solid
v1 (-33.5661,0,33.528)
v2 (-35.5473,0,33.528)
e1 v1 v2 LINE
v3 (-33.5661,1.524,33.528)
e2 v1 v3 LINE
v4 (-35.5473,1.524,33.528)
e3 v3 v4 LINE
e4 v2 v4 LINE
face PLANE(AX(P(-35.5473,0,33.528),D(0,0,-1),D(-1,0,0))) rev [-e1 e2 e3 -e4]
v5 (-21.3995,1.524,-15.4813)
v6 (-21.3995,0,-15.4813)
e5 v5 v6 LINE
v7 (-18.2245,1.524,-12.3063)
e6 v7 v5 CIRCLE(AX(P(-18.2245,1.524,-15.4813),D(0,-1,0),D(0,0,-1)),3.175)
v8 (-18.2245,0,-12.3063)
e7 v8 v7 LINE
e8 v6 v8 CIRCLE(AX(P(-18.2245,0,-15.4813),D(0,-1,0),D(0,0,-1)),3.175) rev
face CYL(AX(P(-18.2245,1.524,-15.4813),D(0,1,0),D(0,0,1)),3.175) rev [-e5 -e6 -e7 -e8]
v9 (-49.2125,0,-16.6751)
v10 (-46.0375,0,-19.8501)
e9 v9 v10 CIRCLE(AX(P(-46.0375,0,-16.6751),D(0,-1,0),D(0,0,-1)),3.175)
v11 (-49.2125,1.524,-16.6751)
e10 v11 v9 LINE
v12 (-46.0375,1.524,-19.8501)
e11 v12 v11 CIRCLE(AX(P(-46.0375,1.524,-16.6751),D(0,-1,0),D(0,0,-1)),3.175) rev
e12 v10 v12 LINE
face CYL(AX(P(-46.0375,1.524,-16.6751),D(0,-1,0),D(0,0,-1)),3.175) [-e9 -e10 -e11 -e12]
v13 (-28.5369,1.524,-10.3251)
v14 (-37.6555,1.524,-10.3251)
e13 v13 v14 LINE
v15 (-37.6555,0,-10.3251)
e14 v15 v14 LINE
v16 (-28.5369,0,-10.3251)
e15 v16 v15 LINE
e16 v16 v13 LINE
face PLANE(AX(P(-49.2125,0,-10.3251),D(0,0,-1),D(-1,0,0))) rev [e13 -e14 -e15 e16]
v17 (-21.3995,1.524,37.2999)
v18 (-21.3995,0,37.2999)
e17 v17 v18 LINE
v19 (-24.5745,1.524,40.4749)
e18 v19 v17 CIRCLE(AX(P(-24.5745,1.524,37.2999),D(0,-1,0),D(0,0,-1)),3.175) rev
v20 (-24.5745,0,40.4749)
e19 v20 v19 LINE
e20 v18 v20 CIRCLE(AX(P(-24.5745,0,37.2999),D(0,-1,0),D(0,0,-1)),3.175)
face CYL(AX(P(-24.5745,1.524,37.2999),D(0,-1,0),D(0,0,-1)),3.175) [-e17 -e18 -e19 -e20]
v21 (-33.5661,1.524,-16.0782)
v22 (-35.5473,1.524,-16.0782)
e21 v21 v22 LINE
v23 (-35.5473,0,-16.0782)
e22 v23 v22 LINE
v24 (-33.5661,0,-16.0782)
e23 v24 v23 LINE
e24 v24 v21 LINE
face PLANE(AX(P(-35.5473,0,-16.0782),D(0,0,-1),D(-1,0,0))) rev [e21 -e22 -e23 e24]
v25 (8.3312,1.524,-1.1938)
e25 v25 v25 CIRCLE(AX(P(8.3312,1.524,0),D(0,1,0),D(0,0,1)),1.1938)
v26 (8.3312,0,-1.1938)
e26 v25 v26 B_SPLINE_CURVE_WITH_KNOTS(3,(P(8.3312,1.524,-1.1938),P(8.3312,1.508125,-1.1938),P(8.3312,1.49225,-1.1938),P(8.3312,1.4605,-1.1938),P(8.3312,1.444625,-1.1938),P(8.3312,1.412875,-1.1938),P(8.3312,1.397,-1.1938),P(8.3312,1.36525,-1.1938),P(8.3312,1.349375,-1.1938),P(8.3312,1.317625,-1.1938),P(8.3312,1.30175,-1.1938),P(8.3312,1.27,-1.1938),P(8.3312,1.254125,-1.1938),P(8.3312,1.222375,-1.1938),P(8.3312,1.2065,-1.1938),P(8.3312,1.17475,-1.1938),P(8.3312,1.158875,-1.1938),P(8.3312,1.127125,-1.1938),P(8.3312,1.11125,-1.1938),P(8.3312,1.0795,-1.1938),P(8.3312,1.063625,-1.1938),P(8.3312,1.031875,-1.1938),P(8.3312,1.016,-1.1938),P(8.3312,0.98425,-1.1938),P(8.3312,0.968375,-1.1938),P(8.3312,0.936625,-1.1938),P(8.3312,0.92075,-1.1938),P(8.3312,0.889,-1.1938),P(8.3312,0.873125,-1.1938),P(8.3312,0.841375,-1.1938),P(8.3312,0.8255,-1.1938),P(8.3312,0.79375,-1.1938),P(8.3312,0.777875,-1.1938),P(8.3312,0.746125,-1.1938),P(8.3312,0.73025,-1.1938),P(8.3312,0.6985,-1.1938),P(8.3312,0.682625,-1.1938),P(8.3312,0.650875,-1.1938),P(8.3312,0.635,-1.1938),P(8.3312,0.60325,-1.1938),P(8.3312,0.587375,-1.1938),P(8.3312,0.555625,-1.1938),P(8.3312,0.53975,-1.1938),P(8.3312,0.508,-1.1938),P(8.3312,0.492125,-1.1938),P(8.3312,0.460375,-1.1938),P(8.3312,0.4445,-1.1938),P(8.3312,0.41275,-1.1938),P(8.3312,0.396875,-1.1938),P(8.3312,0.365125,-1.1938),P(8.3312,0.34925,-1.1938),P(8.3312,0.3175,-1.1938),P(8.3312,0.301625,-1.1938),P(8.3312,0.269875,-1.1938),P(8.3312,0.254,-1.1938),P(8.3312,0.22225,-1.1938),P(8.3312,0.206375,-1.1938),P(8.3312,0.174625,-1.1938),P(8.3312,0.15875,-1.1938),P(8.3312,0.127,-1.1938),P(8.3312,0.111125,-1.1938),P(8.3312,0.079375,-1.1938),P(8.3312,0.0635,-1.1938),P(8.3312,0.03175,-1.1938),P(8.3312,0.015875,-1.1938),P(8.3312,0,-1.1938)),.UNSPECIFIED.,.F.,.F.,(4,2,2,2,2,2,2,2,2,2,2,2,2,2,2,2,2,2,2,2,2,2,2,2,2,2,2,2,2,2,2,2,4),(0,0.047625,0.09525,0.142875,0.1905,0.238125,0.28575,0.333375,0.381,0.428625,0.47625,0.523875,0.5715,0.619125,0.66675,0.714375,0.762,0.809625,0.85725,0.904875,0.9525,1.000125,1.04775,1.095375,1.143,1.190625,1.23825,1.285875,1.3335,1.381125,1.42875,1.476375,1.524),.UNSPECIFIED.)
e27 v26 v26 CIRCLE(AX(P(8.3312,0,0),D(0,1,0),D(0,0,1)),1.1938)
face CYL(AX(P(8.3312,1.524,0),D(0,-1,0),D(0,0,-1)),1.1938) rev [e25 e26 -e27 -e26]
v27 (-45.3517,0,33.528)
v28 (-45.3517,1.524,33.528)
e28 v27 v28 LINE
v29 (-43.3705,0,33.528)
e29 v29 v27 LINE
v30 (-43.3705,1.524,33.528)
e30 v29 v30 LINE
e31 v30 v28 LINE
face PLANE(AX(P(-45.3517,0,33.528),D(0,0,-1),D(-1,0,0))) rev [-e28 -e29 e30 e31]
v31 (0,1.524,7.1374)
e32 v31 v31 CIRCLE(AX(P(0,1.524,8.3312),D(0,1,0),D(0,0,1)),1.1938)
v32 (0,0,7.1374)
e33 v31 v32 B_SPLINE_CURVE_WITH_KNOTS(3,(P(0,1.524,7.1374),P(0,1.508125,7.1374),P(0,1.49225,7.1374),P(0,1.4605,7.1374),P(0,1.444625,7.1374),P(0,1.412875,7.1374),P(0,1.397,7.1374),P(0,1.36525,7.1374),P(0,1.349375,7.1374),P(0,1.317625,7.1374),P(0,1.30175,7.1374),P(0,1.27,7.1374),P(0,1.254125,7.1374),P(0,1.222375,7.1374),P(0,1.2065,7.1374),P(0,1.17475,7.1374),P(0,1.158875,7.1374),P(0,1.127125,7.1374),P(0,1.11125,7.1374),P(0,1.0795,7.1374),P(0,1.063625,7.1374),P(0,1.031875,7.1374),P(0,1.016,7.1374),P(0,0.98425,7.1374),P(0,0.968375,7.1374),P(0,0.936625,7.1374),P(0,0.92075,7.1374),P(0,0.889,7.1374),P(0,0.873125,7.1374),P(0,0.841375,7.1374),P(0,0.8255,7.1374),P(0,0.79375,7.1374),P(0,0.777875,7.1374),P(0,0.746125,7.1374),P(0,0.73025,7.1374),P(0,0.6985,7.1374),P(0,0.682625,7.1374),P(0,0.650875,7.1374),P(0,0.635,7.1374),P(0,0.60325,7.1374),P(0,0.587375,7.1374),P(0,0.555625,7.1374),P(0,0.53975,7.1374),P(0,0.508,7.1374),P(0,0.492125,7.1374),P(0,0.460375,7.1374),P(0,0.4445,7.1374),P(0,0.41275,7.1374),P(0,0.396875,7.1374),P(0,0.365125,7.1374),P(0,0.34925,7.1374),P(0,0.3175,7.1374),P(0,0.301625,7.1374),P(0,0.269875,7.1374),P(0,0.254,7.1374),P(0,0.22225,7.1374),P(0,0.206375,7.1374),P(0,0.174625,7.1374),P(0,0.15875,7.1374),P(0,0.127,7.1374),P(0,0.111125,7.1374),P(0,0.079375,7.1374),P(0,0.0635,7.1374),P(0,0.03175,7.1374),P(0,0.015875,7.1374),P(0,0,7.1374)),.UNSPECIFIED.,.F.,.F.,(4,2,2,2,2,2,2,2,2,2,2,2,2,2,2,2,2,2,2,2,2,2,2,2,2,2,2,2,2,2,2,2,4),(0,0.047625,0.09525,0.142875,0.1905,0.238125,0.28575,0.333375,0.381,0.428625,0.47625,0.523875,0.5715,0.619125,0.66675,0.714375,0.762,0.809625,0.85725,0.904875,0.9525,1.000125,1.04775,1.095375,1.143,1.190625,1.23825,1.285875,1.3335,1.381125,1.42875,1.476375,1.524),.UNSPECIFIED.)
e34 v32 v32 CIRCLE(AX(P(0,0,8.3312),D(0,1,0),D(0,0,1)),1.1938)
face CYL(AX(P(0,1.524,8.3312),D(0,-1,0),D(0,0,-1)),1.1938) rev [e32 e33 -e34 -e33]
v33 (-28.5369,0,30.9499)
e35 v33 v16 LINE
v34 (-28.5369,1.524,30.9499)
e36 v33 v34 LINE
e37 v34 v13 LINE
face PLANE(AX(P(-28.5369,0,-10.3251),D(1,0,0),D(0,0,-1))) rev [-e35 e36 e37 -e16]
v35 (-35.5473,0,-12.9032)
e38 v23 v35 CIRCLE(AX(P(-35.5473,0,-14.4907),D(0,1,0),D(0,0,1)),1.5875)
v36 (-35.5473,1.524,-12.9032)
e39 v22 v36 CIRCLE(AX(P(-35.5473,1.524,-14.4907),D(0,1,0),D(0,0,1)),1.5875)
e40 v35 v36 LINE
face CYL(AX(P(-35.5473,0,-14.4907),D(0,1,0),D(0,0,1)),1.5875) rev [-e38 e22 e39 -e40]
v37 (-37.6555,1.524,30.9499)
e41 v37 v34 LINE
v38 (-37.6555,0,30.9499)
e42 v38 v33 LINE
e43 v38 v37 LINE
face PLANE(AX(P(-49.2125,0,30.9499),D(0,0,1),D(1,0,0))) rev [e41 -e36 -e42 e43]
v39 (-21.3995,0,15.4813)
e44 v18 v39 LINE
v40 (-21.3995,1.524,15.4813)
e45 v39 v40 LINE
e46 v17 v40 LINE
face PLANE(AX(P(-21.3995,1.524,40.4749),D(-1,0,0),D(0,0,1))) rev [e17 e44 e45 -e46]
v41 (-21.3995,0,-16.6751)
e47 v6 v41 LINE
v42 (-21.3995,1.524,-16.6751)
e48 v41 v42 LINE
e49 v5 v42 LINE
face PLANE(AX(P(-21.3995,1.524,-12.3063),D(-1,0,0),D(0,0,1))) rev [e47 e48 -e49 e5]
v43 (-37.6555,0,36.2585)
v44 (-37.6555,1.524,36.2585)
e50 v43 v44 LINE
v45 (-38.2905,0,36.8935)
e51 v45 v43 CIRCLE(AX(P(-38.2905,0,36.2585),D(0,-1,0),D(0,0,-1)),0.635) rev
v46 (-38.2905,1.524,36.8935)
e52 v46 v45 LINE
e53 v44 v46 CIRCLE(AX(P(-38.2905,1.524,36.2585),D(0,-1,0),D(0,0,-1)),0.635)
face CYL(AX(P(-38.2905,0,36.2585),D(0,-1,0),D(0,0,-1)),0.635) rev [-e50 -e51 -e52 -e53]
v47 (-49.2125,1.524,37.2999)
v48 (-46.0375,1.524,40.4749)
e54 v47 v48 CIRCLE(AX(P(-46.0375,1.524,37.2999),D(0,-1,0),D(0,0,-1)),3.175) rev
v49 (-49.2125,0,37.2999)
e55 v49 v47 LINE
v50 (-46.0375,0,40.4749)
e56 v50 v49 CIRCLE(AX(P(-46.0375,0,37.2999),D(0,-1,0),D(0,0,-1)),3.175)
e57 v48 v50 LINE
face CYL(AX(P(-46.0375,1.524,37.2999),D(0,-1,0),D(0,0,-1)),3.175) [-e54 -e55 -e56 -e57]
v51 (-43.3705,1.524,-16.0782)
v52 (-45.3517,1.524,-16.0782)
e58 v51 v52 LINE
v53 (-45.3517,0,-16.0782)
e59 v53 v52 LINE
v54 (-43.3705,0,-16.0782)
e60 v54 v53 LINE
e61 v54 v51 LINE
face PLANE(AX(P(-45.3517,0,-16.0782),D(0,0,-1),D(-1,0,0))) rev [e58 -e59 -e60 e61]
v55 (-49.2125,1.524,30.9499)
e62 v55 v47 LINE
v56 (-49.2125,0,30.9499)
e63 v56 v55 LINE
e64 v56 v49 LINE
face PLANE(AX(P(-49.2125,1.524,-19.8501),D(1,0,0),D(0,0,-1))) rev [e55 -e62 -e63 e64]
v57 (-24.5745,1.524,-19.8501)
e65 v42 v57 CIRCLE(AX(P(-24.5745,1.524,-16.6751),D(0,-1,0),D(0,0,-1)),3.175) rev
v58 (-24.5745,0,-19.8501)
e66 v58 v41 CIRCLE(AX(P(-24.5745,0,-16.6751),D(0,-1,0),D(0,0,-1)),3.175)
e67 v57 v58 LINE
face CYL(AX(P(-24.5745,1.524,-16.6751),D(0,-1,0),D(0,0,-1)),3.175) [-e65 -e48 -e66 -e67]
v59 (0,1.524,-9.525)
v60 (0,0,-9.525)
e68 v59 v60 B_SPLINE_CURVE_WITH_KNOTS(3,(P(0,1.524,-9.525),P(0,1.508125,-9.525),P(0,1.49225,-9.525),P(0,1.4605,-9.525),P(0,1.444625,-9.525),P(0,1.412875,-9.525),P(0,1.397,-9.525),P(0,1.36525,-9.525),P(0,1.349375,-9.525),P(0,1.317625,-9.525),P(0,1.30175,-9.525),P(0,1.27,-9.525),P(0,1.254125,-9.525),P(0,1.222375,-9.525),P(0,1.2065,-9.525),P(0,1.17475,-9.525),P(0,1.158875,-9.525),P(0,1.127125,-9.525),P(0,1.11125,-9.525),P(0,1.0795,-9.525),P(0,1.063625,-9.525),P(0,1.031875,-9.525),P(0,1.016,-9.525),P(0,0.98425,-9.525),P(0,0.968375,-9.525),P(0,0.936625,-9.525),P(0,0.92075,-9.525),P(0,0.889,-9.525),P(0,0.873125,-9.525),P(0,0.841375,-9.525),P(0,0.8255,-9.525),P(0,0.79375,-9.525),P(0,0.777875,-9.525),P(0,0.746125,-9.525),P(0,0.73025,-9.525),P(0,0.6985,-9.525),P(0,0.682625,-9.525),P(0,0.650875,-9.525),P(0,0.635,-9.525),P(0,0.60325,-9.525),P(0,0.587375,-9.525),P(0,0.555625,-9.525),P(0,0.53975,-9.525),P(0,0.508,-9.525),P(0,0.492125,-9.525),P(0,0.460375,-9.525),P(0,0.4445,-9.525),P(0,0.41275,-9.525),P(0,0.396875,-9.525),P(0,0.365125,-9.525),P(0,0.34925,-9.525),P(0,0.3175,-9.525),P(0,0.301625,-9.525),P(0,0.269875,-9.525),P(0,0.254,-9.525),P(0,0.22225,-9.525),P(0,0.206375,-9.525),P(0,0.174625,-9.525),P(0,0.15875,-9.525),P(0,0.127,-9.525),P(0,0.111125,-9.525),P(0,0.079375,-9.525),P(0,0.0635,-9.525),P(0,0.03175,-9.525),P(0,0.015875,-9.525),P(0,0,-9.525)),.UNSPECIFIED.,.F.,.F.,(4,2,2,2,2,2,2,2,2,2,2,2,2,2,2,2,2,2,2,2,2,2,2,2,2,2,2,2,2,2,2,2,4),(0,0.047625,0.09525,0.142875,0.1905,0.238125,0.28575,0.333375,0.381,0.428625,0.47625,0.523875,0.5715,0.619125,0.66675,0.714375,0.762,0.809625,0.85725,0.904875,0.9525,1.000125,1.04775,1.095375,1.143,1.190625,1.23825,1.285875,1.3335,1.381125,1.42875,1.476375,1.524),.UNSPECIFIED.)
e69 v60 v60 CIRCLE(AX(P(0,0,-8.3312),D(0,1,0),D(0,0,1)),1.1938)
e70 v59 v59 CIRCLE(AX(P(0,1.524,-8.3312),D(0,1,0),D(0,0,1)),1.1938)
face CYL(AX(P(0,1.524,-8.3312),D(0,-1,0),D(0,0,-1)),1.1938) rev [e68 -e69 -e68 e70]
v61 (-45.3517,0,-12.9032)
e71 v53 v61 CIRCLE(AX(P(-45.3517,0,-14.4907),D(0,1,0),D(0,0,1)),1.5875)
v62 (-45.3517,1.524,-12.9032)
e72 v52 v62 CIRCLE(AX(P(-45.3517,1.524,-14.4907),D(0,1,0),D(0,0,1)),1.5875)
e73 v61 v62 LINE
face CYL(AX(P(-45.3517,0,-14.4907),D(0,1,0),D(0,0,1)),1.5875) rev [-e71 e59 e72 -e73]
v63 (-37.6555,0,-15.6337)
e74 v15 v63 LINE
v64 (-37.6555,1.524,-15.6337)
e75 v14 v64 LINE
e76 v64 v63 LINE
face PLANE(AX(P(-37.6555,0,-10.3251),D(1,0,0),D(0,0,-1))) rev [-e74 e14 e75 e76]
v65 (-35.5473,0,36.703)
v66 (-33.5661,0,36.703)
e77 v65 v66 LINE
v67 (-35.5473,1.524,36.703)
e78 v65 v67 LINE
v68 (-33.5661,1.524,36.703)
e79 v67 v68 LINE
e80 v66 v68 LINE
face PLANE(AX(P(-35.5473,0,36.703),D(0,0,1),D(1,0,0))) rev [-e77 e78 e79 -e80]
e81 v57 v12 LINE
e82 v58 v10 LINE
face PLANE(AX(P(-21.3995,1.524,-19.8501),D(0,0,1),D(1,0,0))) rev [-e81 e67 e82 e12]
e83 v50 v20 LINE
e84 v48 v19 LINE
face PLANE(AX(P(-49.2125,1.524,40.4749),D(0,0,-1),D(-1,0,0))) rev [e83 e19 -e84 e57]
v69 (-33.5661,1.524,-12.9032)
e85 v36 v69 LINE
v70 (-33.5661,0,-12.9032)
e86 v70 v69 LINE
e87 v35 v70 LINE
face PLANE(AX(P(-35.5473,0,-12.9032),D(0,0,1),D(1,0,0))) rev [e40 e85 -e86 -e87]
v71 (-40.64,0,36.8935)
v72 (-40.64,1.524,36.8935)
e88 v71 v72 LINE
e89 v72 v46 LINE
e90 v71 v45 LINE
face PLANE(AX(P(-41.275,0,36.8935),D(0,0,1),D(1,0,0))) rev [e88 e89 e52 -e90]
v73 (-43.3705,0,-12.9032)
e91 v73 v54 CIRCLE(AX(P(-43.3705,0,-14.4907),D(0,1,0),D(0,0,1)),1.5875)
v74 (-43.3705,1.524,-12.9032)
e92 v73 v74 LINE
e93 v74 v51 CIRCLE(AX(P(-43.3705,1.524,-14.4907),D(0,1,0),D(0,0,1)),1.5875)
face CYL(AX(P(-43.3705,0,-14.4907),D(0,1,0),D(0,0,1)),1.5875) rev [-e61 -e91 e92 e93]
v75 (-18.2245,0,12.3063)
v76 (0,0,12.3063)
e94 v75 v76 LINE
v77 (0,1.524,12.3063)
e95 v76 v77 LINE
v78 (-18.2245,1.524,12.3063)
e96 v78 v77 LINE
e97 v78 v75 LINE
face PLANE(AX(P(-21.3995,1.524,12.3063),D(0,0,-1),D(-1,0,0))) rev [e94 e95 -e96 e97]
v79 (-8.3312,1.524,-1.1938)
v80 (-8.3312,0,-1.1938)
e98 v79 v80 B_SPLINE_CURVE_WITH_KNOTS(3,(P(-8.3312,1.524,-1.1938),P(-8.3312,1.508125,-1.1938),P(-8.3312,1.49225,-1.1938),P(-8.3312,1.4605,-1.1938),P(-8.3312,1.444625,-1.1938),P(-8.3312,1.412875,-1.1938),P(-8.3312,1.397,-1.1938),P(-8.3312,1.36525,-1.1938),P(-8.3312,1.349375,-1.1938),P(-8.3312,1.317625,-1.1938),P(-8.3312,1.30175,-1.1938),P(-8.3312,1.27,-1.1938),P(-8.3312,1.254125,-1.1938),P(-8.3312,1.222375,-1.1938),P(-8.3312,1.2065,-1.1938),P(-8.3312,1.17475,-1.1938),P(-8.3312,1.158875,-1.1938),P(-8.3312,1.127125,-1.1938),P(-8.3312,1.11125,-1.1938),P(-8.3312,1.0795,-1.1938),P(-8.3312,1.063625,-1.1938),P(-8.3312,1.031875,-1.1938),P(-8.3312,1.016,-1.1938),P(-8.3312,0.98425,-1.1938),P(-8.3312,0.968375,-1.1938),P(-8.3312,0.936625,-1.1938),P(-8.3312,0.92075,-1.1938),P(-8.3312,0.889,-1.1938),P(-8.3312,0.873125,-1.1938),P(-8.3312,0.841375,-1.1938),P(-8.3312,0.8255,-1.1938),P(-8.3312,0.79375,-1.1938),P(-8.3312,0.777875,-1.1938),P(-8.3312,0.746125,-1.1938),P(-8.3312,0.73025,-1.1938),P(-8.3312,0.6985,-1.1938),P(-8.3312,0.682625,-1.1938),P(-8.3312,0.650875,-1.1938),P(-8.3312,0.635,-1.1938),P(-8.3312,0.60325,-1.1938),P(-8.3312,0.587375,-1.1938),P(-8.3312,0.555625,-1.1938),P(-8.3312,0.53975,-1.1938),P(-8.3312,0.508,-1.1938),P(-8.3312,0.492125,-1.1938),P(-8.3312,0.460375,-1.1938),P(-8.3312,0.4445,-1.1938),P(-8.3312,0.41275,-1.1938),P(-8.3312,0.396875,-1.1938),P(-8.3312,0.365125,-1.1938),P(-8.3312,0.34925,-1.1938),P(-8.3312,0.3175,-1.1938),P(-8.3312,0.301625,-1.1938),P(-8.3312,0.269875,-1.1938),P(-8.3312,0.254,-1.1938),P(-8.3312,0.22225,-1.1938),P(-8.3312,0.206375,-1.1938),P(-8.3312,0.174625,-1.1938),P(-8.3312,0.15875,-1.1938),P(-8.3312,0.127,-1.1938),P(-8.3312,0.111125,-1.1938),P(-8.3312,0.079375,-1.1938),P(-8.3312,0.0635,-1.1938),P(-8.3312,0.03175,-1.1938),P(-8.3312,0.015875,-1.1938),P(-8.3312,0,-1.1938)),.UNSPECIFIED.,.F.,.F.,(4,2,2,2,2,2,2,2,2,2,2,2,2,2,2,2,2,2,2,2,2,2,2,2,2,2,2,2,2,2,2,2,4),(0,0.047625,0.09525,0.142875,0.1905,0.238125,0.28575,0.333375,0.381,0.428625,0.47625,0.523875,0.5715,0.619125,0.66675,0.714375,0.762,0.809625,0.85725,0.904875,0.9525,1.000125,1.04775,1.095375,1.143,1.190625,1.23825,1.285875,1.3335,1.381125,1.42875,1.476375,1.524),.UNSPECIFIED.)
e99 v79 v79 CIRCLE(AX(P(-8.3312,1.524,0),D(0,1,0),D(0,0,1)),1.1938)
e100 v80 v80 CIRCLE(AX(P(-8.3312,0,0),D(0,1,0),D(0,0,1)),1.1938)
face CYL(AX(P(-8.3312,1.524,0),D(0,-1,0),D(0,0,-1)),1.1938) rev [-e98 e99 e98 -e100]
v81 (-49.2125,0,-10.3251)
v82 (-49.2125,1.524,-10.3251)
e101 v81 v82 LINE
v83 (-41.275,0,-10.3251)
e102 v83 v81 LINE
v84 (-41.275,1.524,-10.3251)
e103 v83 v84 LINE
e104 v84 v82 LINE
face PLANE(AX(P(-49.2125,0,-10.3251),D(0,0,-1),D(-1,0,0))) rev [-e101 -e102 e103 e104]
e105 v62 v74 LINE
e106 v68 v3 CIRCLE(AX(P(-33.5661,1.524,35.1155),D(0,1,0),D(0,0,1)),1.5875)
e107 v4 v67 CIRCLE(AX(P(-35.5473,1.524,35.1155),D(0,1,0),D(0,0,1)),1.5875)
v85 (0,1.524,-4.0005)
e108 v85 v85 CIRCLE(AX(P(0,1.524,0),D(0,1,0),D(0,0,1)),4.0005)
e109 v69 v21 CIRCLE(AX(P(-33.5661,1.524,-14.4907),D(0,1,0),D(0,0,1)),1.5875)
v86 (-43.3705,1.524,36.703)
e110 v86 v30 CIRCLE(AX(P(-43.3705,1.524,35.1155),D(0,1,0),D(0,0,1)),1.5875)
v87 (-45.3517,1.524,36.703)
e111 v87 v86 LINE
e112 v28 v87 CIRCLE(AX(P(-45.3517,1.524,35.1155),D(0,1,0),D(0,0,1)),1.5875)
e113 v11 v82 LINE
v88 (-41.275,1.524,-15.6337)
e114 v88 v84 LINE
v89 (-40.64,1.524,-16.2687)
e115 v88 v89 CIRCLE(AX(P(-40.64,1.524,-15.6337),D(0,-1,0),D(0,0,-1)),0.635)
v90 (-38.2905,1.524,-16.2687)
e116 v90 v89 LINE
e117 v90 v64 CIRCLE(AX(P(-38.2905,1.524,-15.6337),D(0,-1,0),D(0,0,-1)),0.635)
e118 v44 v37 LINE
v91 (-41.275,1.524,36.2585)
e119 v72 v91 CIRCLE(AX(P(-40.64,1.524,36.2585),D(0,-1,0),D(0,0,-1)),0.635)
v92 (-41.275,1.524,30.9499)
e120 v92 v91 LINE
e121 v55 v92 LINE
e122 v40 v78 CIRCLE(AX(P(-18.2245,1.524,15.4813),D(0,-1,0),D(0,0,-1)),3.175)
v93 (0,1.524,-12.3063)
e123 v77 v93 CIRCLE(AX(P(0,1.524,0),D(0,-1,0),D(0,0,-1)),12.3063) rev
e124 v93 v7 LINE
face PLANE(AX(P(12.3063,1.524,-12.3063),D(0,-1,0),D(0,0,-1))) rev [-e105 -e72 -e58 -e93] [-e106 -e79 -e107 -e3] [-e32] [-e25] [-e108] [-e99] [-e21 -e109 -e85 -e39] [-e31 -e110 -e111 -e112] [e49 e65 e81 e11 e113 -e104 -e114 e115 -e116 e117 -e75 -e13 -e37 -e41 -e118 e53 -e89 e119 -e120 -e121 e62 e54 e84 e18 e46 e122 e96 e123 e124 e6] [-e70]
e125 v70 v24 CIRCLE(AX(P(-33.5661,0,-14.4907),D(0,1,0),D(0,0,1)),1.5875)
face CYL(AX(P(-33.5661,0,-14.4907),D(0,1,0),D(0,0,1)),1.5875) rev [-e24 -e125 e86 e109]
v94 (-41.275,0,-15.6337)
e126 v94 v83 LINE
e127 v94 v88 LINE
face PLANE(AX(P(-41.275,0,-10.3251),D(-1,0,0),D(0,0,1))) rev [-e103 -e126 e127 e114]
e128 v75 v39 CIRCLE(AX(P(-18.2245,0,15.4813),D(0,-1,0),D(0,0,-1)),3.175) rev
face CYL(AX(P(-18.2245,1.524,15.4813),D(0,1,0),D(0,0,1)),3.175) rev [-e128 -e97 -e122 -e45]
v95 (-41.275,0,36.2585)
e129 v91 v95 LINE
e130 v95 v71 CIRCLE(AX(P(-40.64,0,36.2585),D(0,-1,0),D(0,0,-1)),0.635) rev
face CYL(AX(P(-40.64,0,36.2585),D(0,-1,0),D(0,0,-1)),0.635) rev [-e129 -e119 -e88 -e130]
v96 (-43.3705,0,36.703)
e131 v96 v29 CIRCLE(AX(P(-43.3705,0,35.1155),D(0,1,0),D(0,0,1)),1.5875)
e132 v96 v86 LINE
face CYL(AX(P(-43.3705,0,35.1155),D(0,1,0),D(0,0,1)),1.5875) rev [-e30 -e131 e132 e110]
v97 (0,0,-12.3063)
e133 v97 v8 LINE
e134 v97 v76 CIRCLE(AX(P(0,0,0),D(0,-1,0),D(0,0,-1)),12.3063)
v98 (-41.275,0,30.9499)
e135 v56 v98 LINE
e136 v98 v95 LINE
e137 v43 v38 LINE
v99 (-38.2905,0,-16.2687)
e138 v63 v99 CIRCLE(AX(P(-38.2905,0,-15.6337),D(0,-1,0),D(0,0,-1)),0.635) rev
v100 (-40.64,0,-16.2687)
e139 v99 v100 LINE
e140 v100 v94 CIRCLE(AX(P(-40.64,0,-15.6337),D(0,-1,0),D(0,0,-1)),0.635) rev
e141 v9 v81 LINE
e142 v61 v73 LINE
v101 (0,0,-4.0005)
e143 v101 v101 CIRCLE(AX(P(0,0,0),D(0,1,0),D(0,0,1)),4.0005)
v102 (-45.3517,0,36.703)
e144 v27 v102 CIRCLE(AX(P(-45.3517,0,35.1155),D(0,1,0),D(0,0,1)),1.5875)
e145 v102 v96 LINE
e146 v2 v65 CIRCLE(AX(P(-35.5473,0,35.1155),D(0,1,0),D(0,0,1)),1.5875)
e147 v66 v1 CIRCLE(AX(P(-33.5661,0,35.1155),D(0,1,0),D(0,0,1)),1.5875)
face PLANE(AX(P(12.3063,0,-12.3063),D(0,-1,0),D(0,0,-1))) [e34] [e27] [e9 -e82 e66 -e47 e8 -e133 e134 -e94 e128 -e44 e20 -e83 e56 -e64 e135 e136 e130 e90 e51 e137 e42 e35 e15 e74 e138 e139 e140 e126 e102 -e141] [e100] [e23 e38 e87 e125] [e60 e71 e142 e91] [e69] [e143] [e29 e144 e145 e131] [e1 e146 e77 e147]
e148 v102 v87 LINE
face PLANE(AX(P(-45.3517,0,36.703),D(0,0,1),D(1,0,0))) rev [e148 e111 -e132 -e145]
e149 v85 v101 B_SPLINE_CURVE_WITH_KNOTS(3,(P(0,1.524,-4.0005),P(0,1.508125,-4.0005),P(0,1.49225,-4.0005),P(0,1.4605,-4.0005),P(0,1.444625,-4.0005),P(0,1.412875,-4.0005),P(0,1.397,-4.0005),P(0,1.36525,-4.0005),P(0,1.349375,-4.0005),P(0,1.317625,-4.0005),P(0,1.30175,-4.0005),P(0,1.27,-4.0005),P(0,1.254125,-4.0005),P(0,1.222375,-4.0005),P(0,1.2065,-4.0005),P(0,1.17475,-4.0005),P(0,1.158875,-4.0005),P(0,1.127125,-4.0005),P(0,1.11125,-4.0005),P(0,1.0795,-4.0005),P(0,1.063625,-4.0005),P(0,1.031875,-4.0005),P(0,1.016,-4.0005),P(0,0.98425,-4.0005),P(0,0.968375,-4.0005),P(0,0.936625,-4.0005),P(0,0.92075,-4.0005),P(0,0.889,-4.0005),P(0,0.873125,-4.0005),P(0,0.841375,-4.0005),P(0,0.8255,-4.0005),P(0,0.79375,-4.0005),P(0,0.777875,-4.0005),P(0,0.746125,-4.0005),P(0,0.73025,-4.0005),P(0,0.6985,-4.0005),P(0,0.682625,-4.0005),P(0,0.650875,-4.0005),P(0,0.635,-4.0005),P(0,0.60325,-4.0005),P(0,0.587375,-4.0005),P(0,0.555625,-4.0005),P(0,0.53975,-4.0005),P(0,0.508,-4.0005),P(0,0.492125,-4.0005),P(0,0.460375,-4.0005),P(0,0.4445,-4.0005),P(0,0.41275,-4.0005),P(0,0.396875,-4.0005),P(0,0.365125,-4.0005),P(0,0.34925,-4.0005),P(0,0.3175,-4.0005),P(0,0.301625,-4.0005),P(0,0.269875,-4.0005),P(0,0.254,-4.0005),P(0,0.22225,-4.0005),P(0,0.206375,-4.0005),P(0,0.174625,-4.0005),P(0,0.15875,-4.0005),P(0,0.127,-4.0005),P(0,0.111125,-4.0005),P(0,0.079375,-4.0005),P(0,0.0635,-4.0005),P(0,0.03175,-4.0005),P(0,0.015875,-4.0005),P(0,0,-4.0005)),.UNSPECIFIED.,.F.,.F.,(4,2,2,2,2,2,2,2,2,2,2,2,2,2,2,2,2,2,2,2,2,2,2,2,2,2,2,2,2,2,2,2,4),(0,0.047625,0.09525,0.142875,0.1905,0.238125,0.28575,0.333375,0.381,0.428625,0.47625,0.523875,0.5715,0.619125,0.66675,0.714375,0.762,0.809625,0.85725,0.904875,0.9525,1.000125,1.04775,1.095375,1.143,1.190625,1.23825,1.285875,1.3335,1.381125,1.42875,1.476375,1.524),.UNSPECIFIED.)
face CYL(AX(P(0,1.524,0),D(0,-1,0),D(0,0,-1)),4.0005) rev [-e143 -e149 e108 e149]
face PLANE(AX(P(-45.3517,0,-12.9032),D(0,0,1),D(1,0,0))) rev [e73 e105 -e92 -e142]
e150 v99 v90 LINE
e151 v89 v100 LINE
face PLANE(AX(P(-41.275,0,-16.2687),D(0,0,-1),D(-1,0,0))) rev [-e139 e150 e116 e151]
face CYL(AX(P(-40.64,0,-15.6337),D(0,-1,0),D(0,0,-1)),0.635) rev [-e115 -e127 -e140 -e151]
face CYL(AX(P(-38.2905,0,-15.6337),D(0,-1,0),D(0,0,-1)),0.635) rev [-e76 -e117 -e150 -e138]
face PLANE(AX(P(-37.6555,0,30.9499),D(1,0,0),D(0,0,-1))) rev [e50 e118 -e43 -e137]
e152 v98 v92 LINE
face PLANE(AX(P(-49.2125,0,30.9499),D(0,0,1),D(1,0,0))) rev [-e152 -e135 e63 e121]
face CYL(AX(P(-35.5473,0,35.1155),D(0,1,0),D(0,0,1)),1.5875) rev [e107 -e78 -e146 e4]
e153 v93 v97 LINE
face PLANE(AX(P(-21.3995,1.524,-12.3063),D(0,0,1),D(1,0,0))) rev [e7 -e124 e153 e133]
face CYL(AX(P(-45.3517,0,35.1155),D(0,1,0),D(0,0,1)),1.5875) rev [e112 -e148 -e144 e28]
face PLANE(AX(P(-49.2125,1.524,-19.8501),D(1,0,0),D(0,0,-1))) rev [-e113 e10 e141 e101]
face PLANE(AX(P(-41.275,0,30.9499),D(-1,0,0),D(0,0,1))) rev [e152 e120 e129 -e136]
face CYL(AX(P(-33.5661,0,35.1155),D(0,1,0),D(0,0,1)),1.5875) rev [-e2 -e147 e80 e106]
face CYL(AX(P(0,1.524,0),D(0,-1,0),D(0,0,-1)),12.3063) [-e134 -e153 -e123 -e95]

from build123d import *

# Parameters (mm, degrees)
SKETCH1_R          = 4.0005
SKETCH1_R_2        = 1.1938
BASE_FLANGE1_DEPTH = 1.524
SKETCH3_W          = 20.6756
SKETCH3_H          = 41.275
EXTRUDE1_DEPTH     = 1.524
SKETCH4_W          = 3.6195
SKETCH4_H          = 5.9436
EXTRUDE2_DEPTH     = 1.524
FILLET1_R          = 3.175
FILLET2_RADIUS     = 12.3063
FILLET2_LENGTH     = 1.524
FILLET3_R          = 0.635


# Sheet-metal steps are written as plain solids
with BuildPart() as part:
    # Sketch1 → Base-Flange1 (new body)
    with BuildSketch(Plane(origin=(0, 0, 0), x_dir=(1, 0, 0), z_dir=(0, 1, 0))):
        Polygon((12.3063, 12.3063), (12.3063, -12.3063), (-21.3995, -12.3063), (-21.3995, -40.4749), (-49.2125, -40.4749), (-49.2125, 19.8501), (-21.3995, 19.8501), (-21.3995, 12.3063), align=None)
        with Locations(Location((0, 0, 0), (0, 0, 90))):
            Circle(SKETCH1_R, mode=Mode.SUBTRACT)
        with Locations(Location((0, 8.3312, 0), (0, 0, 90))):
            Circle(SKETCH1_R_2, mode=Mode.SUBTRACT)
        with Locations(Location((8.3312, 0, 0), (0, 0, 90))):
            Circle(SKETCH1_R_2, mode=Mode.SUBTRACT)
        with Locations(Location((0, -8.3312, 0), (0, 0, 90))):
            Circle(SKETCH1_R_2, mode=Mode.SUBTRACT)
        with Locations(Location((-8.3312, 0, 0), (0, 0, 90))):
            Circle(SKETCH1_R_2, mode=Mode.SUBTRACT)
    extrude(amount=BASE_FLANGE1_DEPTH)

    # Sketch3 → Extrude1 (cut)
    with BuildSketch(Plane(origin=(0, 1.524, 0), x_dir=(1, 0, 0), z_dir=(0, 1, 0))):
        with Locations((-38.8747, -10.3124)):
            Rectangle(SKETCH3_W, SKETCH3_H)
    extrude(amount=-EXTRUDE1_DEPTH, mode=Mode.SUBTRACT)

    # Sketch4 → Extrude2 (cut)
    with BuildSketch(Plane(origin=(0, 1.524, 0), x_dir=(1, 0, 0), z_dir=(0, 1, 0))):
        with Locations((-39.46525, 13.2969)):
            Rectangle(SKETCH4_W, SKETCH4_H)
        with Locations((-39.46525, -33.9217)):
            Rectangle(SKETCH4_W, SKETCH4_H)
        with BuildLine():
            Line((-35.5473, 16.0782), (-33.5661, 16.0782))
            ThreePointArc((-33.5661, 16.0782), (-31.9786, 14.4907), (-33.5661, 12.9032))
            Line((-33.5661, 12.9032), (-35.5473, 12.9032))
            ThreePointArc((-35.5473, 12.9032), (-37.1348, 14.4907), (-35.5473, 16.0782))
        make_face()
        with BuildLine():
            Line((-45.3517, 16.0782), (-43.3705, 16.0782))
            ThreePointArc((-43.3705, 16.0782), (-41.783, 14.4907), (-43.3705, 12.9032))
            Line((-43.3705, 12.9032), (-45.3517, 12.9032))
            ThreePointArc((-45.3517, 12.9032), (-46.9392, 14.4907), (-45.3517, 16.0782))
        make_face()
        with BuildLine():
            Line((-35.5473, -33.528), (-33.5661, -33.528))
            ThreePointArc((-33.5661, -33.528), (-31.9786, -35.1155), (-33.5661, -36.703))
            Line((-33.5661, -36.703), (-35.5473, -36.703))
            ThreePointArc((-35.5473, -36.703), (-37.1348, -35.1155), (-35.5473, -33.528))
        make_face()
        with BuildLine():
            Line((-45.3517, -33.528), (-43.3705, -33.528))
            ThreePointArc((-43.3705, -33.528), (-41.783, -35.1155), (-43.3705, -36.703))
            Line((-43.3705, -36.703), (-45.3517, -36.703))
            ThreePointArc((-45.3517, -36.703), (-46.9392, -35.1155), (-45.3517, -33.528))
        make_face()
    extrude(amount=-EXTRUDE2_DEPTH, mode=Mode.SUBTRACT)

    # Fillet1
    fillet1_edges = [part.edges().sort_by_distance(p)[0] for p in [
        (-21.3995, 0.762, 12.3063),
        (-21.3995, 0.762, 40.4749),
        (-49.2125, 0.762, 40.4749),
        (-49.2125, 0.762, -19.8501),
        (-21.3995, 0.762, -19.8501),
        (-21.3995, 0.762, -12.3063),
    ]]
    fillet(fillet1_edges, radius=FILLET1_R)

    # Fillet2: full round fillet: the end face becomes a half cylinder, R = half its width
    fillet2_face = Plane((12.3063, 0.762, 0), x_dir=(0, 1, 0), z_dir=(1, 0, 0))  # on the end face: x along it, z out of the body
    fillet2_slab = fillet2_face.offset(-FILLET2_RADIUS / 2) * Box(FILLET2_LENGTH, 2 * FILLET2_RADIUS, FILLET2_RADIUS, mode=Mode.PRIVATE)  # the body's end, R deep
    fillet2_round = Plane((0, 0.762, 0), x_dir=(1, 0, 0), z_dir=(0, 1, 0)) * Cylinder(FILLET2_RADIUS, FILLET2_LENGTH, mode=Mode.PRIVATE)  # its axis R under the face
    add(fillet2_slab - fillet2_round, mode=Mode.SUBTRACT)

    # Fillet3
    fillet3_edges = [part.edges().sort_by_distance(p)[0] for p in [
        (-41.275, 0.762, -16.2687),
        (-37.6555, 0.762, -16.2687),
        (-41.275, 0.762, 36.8935),
        (-37.6555, 0.762, 36.8935),
    ]]
    fillet(fillet3_edges, radius=FILLET3_R)


solid = part.part
